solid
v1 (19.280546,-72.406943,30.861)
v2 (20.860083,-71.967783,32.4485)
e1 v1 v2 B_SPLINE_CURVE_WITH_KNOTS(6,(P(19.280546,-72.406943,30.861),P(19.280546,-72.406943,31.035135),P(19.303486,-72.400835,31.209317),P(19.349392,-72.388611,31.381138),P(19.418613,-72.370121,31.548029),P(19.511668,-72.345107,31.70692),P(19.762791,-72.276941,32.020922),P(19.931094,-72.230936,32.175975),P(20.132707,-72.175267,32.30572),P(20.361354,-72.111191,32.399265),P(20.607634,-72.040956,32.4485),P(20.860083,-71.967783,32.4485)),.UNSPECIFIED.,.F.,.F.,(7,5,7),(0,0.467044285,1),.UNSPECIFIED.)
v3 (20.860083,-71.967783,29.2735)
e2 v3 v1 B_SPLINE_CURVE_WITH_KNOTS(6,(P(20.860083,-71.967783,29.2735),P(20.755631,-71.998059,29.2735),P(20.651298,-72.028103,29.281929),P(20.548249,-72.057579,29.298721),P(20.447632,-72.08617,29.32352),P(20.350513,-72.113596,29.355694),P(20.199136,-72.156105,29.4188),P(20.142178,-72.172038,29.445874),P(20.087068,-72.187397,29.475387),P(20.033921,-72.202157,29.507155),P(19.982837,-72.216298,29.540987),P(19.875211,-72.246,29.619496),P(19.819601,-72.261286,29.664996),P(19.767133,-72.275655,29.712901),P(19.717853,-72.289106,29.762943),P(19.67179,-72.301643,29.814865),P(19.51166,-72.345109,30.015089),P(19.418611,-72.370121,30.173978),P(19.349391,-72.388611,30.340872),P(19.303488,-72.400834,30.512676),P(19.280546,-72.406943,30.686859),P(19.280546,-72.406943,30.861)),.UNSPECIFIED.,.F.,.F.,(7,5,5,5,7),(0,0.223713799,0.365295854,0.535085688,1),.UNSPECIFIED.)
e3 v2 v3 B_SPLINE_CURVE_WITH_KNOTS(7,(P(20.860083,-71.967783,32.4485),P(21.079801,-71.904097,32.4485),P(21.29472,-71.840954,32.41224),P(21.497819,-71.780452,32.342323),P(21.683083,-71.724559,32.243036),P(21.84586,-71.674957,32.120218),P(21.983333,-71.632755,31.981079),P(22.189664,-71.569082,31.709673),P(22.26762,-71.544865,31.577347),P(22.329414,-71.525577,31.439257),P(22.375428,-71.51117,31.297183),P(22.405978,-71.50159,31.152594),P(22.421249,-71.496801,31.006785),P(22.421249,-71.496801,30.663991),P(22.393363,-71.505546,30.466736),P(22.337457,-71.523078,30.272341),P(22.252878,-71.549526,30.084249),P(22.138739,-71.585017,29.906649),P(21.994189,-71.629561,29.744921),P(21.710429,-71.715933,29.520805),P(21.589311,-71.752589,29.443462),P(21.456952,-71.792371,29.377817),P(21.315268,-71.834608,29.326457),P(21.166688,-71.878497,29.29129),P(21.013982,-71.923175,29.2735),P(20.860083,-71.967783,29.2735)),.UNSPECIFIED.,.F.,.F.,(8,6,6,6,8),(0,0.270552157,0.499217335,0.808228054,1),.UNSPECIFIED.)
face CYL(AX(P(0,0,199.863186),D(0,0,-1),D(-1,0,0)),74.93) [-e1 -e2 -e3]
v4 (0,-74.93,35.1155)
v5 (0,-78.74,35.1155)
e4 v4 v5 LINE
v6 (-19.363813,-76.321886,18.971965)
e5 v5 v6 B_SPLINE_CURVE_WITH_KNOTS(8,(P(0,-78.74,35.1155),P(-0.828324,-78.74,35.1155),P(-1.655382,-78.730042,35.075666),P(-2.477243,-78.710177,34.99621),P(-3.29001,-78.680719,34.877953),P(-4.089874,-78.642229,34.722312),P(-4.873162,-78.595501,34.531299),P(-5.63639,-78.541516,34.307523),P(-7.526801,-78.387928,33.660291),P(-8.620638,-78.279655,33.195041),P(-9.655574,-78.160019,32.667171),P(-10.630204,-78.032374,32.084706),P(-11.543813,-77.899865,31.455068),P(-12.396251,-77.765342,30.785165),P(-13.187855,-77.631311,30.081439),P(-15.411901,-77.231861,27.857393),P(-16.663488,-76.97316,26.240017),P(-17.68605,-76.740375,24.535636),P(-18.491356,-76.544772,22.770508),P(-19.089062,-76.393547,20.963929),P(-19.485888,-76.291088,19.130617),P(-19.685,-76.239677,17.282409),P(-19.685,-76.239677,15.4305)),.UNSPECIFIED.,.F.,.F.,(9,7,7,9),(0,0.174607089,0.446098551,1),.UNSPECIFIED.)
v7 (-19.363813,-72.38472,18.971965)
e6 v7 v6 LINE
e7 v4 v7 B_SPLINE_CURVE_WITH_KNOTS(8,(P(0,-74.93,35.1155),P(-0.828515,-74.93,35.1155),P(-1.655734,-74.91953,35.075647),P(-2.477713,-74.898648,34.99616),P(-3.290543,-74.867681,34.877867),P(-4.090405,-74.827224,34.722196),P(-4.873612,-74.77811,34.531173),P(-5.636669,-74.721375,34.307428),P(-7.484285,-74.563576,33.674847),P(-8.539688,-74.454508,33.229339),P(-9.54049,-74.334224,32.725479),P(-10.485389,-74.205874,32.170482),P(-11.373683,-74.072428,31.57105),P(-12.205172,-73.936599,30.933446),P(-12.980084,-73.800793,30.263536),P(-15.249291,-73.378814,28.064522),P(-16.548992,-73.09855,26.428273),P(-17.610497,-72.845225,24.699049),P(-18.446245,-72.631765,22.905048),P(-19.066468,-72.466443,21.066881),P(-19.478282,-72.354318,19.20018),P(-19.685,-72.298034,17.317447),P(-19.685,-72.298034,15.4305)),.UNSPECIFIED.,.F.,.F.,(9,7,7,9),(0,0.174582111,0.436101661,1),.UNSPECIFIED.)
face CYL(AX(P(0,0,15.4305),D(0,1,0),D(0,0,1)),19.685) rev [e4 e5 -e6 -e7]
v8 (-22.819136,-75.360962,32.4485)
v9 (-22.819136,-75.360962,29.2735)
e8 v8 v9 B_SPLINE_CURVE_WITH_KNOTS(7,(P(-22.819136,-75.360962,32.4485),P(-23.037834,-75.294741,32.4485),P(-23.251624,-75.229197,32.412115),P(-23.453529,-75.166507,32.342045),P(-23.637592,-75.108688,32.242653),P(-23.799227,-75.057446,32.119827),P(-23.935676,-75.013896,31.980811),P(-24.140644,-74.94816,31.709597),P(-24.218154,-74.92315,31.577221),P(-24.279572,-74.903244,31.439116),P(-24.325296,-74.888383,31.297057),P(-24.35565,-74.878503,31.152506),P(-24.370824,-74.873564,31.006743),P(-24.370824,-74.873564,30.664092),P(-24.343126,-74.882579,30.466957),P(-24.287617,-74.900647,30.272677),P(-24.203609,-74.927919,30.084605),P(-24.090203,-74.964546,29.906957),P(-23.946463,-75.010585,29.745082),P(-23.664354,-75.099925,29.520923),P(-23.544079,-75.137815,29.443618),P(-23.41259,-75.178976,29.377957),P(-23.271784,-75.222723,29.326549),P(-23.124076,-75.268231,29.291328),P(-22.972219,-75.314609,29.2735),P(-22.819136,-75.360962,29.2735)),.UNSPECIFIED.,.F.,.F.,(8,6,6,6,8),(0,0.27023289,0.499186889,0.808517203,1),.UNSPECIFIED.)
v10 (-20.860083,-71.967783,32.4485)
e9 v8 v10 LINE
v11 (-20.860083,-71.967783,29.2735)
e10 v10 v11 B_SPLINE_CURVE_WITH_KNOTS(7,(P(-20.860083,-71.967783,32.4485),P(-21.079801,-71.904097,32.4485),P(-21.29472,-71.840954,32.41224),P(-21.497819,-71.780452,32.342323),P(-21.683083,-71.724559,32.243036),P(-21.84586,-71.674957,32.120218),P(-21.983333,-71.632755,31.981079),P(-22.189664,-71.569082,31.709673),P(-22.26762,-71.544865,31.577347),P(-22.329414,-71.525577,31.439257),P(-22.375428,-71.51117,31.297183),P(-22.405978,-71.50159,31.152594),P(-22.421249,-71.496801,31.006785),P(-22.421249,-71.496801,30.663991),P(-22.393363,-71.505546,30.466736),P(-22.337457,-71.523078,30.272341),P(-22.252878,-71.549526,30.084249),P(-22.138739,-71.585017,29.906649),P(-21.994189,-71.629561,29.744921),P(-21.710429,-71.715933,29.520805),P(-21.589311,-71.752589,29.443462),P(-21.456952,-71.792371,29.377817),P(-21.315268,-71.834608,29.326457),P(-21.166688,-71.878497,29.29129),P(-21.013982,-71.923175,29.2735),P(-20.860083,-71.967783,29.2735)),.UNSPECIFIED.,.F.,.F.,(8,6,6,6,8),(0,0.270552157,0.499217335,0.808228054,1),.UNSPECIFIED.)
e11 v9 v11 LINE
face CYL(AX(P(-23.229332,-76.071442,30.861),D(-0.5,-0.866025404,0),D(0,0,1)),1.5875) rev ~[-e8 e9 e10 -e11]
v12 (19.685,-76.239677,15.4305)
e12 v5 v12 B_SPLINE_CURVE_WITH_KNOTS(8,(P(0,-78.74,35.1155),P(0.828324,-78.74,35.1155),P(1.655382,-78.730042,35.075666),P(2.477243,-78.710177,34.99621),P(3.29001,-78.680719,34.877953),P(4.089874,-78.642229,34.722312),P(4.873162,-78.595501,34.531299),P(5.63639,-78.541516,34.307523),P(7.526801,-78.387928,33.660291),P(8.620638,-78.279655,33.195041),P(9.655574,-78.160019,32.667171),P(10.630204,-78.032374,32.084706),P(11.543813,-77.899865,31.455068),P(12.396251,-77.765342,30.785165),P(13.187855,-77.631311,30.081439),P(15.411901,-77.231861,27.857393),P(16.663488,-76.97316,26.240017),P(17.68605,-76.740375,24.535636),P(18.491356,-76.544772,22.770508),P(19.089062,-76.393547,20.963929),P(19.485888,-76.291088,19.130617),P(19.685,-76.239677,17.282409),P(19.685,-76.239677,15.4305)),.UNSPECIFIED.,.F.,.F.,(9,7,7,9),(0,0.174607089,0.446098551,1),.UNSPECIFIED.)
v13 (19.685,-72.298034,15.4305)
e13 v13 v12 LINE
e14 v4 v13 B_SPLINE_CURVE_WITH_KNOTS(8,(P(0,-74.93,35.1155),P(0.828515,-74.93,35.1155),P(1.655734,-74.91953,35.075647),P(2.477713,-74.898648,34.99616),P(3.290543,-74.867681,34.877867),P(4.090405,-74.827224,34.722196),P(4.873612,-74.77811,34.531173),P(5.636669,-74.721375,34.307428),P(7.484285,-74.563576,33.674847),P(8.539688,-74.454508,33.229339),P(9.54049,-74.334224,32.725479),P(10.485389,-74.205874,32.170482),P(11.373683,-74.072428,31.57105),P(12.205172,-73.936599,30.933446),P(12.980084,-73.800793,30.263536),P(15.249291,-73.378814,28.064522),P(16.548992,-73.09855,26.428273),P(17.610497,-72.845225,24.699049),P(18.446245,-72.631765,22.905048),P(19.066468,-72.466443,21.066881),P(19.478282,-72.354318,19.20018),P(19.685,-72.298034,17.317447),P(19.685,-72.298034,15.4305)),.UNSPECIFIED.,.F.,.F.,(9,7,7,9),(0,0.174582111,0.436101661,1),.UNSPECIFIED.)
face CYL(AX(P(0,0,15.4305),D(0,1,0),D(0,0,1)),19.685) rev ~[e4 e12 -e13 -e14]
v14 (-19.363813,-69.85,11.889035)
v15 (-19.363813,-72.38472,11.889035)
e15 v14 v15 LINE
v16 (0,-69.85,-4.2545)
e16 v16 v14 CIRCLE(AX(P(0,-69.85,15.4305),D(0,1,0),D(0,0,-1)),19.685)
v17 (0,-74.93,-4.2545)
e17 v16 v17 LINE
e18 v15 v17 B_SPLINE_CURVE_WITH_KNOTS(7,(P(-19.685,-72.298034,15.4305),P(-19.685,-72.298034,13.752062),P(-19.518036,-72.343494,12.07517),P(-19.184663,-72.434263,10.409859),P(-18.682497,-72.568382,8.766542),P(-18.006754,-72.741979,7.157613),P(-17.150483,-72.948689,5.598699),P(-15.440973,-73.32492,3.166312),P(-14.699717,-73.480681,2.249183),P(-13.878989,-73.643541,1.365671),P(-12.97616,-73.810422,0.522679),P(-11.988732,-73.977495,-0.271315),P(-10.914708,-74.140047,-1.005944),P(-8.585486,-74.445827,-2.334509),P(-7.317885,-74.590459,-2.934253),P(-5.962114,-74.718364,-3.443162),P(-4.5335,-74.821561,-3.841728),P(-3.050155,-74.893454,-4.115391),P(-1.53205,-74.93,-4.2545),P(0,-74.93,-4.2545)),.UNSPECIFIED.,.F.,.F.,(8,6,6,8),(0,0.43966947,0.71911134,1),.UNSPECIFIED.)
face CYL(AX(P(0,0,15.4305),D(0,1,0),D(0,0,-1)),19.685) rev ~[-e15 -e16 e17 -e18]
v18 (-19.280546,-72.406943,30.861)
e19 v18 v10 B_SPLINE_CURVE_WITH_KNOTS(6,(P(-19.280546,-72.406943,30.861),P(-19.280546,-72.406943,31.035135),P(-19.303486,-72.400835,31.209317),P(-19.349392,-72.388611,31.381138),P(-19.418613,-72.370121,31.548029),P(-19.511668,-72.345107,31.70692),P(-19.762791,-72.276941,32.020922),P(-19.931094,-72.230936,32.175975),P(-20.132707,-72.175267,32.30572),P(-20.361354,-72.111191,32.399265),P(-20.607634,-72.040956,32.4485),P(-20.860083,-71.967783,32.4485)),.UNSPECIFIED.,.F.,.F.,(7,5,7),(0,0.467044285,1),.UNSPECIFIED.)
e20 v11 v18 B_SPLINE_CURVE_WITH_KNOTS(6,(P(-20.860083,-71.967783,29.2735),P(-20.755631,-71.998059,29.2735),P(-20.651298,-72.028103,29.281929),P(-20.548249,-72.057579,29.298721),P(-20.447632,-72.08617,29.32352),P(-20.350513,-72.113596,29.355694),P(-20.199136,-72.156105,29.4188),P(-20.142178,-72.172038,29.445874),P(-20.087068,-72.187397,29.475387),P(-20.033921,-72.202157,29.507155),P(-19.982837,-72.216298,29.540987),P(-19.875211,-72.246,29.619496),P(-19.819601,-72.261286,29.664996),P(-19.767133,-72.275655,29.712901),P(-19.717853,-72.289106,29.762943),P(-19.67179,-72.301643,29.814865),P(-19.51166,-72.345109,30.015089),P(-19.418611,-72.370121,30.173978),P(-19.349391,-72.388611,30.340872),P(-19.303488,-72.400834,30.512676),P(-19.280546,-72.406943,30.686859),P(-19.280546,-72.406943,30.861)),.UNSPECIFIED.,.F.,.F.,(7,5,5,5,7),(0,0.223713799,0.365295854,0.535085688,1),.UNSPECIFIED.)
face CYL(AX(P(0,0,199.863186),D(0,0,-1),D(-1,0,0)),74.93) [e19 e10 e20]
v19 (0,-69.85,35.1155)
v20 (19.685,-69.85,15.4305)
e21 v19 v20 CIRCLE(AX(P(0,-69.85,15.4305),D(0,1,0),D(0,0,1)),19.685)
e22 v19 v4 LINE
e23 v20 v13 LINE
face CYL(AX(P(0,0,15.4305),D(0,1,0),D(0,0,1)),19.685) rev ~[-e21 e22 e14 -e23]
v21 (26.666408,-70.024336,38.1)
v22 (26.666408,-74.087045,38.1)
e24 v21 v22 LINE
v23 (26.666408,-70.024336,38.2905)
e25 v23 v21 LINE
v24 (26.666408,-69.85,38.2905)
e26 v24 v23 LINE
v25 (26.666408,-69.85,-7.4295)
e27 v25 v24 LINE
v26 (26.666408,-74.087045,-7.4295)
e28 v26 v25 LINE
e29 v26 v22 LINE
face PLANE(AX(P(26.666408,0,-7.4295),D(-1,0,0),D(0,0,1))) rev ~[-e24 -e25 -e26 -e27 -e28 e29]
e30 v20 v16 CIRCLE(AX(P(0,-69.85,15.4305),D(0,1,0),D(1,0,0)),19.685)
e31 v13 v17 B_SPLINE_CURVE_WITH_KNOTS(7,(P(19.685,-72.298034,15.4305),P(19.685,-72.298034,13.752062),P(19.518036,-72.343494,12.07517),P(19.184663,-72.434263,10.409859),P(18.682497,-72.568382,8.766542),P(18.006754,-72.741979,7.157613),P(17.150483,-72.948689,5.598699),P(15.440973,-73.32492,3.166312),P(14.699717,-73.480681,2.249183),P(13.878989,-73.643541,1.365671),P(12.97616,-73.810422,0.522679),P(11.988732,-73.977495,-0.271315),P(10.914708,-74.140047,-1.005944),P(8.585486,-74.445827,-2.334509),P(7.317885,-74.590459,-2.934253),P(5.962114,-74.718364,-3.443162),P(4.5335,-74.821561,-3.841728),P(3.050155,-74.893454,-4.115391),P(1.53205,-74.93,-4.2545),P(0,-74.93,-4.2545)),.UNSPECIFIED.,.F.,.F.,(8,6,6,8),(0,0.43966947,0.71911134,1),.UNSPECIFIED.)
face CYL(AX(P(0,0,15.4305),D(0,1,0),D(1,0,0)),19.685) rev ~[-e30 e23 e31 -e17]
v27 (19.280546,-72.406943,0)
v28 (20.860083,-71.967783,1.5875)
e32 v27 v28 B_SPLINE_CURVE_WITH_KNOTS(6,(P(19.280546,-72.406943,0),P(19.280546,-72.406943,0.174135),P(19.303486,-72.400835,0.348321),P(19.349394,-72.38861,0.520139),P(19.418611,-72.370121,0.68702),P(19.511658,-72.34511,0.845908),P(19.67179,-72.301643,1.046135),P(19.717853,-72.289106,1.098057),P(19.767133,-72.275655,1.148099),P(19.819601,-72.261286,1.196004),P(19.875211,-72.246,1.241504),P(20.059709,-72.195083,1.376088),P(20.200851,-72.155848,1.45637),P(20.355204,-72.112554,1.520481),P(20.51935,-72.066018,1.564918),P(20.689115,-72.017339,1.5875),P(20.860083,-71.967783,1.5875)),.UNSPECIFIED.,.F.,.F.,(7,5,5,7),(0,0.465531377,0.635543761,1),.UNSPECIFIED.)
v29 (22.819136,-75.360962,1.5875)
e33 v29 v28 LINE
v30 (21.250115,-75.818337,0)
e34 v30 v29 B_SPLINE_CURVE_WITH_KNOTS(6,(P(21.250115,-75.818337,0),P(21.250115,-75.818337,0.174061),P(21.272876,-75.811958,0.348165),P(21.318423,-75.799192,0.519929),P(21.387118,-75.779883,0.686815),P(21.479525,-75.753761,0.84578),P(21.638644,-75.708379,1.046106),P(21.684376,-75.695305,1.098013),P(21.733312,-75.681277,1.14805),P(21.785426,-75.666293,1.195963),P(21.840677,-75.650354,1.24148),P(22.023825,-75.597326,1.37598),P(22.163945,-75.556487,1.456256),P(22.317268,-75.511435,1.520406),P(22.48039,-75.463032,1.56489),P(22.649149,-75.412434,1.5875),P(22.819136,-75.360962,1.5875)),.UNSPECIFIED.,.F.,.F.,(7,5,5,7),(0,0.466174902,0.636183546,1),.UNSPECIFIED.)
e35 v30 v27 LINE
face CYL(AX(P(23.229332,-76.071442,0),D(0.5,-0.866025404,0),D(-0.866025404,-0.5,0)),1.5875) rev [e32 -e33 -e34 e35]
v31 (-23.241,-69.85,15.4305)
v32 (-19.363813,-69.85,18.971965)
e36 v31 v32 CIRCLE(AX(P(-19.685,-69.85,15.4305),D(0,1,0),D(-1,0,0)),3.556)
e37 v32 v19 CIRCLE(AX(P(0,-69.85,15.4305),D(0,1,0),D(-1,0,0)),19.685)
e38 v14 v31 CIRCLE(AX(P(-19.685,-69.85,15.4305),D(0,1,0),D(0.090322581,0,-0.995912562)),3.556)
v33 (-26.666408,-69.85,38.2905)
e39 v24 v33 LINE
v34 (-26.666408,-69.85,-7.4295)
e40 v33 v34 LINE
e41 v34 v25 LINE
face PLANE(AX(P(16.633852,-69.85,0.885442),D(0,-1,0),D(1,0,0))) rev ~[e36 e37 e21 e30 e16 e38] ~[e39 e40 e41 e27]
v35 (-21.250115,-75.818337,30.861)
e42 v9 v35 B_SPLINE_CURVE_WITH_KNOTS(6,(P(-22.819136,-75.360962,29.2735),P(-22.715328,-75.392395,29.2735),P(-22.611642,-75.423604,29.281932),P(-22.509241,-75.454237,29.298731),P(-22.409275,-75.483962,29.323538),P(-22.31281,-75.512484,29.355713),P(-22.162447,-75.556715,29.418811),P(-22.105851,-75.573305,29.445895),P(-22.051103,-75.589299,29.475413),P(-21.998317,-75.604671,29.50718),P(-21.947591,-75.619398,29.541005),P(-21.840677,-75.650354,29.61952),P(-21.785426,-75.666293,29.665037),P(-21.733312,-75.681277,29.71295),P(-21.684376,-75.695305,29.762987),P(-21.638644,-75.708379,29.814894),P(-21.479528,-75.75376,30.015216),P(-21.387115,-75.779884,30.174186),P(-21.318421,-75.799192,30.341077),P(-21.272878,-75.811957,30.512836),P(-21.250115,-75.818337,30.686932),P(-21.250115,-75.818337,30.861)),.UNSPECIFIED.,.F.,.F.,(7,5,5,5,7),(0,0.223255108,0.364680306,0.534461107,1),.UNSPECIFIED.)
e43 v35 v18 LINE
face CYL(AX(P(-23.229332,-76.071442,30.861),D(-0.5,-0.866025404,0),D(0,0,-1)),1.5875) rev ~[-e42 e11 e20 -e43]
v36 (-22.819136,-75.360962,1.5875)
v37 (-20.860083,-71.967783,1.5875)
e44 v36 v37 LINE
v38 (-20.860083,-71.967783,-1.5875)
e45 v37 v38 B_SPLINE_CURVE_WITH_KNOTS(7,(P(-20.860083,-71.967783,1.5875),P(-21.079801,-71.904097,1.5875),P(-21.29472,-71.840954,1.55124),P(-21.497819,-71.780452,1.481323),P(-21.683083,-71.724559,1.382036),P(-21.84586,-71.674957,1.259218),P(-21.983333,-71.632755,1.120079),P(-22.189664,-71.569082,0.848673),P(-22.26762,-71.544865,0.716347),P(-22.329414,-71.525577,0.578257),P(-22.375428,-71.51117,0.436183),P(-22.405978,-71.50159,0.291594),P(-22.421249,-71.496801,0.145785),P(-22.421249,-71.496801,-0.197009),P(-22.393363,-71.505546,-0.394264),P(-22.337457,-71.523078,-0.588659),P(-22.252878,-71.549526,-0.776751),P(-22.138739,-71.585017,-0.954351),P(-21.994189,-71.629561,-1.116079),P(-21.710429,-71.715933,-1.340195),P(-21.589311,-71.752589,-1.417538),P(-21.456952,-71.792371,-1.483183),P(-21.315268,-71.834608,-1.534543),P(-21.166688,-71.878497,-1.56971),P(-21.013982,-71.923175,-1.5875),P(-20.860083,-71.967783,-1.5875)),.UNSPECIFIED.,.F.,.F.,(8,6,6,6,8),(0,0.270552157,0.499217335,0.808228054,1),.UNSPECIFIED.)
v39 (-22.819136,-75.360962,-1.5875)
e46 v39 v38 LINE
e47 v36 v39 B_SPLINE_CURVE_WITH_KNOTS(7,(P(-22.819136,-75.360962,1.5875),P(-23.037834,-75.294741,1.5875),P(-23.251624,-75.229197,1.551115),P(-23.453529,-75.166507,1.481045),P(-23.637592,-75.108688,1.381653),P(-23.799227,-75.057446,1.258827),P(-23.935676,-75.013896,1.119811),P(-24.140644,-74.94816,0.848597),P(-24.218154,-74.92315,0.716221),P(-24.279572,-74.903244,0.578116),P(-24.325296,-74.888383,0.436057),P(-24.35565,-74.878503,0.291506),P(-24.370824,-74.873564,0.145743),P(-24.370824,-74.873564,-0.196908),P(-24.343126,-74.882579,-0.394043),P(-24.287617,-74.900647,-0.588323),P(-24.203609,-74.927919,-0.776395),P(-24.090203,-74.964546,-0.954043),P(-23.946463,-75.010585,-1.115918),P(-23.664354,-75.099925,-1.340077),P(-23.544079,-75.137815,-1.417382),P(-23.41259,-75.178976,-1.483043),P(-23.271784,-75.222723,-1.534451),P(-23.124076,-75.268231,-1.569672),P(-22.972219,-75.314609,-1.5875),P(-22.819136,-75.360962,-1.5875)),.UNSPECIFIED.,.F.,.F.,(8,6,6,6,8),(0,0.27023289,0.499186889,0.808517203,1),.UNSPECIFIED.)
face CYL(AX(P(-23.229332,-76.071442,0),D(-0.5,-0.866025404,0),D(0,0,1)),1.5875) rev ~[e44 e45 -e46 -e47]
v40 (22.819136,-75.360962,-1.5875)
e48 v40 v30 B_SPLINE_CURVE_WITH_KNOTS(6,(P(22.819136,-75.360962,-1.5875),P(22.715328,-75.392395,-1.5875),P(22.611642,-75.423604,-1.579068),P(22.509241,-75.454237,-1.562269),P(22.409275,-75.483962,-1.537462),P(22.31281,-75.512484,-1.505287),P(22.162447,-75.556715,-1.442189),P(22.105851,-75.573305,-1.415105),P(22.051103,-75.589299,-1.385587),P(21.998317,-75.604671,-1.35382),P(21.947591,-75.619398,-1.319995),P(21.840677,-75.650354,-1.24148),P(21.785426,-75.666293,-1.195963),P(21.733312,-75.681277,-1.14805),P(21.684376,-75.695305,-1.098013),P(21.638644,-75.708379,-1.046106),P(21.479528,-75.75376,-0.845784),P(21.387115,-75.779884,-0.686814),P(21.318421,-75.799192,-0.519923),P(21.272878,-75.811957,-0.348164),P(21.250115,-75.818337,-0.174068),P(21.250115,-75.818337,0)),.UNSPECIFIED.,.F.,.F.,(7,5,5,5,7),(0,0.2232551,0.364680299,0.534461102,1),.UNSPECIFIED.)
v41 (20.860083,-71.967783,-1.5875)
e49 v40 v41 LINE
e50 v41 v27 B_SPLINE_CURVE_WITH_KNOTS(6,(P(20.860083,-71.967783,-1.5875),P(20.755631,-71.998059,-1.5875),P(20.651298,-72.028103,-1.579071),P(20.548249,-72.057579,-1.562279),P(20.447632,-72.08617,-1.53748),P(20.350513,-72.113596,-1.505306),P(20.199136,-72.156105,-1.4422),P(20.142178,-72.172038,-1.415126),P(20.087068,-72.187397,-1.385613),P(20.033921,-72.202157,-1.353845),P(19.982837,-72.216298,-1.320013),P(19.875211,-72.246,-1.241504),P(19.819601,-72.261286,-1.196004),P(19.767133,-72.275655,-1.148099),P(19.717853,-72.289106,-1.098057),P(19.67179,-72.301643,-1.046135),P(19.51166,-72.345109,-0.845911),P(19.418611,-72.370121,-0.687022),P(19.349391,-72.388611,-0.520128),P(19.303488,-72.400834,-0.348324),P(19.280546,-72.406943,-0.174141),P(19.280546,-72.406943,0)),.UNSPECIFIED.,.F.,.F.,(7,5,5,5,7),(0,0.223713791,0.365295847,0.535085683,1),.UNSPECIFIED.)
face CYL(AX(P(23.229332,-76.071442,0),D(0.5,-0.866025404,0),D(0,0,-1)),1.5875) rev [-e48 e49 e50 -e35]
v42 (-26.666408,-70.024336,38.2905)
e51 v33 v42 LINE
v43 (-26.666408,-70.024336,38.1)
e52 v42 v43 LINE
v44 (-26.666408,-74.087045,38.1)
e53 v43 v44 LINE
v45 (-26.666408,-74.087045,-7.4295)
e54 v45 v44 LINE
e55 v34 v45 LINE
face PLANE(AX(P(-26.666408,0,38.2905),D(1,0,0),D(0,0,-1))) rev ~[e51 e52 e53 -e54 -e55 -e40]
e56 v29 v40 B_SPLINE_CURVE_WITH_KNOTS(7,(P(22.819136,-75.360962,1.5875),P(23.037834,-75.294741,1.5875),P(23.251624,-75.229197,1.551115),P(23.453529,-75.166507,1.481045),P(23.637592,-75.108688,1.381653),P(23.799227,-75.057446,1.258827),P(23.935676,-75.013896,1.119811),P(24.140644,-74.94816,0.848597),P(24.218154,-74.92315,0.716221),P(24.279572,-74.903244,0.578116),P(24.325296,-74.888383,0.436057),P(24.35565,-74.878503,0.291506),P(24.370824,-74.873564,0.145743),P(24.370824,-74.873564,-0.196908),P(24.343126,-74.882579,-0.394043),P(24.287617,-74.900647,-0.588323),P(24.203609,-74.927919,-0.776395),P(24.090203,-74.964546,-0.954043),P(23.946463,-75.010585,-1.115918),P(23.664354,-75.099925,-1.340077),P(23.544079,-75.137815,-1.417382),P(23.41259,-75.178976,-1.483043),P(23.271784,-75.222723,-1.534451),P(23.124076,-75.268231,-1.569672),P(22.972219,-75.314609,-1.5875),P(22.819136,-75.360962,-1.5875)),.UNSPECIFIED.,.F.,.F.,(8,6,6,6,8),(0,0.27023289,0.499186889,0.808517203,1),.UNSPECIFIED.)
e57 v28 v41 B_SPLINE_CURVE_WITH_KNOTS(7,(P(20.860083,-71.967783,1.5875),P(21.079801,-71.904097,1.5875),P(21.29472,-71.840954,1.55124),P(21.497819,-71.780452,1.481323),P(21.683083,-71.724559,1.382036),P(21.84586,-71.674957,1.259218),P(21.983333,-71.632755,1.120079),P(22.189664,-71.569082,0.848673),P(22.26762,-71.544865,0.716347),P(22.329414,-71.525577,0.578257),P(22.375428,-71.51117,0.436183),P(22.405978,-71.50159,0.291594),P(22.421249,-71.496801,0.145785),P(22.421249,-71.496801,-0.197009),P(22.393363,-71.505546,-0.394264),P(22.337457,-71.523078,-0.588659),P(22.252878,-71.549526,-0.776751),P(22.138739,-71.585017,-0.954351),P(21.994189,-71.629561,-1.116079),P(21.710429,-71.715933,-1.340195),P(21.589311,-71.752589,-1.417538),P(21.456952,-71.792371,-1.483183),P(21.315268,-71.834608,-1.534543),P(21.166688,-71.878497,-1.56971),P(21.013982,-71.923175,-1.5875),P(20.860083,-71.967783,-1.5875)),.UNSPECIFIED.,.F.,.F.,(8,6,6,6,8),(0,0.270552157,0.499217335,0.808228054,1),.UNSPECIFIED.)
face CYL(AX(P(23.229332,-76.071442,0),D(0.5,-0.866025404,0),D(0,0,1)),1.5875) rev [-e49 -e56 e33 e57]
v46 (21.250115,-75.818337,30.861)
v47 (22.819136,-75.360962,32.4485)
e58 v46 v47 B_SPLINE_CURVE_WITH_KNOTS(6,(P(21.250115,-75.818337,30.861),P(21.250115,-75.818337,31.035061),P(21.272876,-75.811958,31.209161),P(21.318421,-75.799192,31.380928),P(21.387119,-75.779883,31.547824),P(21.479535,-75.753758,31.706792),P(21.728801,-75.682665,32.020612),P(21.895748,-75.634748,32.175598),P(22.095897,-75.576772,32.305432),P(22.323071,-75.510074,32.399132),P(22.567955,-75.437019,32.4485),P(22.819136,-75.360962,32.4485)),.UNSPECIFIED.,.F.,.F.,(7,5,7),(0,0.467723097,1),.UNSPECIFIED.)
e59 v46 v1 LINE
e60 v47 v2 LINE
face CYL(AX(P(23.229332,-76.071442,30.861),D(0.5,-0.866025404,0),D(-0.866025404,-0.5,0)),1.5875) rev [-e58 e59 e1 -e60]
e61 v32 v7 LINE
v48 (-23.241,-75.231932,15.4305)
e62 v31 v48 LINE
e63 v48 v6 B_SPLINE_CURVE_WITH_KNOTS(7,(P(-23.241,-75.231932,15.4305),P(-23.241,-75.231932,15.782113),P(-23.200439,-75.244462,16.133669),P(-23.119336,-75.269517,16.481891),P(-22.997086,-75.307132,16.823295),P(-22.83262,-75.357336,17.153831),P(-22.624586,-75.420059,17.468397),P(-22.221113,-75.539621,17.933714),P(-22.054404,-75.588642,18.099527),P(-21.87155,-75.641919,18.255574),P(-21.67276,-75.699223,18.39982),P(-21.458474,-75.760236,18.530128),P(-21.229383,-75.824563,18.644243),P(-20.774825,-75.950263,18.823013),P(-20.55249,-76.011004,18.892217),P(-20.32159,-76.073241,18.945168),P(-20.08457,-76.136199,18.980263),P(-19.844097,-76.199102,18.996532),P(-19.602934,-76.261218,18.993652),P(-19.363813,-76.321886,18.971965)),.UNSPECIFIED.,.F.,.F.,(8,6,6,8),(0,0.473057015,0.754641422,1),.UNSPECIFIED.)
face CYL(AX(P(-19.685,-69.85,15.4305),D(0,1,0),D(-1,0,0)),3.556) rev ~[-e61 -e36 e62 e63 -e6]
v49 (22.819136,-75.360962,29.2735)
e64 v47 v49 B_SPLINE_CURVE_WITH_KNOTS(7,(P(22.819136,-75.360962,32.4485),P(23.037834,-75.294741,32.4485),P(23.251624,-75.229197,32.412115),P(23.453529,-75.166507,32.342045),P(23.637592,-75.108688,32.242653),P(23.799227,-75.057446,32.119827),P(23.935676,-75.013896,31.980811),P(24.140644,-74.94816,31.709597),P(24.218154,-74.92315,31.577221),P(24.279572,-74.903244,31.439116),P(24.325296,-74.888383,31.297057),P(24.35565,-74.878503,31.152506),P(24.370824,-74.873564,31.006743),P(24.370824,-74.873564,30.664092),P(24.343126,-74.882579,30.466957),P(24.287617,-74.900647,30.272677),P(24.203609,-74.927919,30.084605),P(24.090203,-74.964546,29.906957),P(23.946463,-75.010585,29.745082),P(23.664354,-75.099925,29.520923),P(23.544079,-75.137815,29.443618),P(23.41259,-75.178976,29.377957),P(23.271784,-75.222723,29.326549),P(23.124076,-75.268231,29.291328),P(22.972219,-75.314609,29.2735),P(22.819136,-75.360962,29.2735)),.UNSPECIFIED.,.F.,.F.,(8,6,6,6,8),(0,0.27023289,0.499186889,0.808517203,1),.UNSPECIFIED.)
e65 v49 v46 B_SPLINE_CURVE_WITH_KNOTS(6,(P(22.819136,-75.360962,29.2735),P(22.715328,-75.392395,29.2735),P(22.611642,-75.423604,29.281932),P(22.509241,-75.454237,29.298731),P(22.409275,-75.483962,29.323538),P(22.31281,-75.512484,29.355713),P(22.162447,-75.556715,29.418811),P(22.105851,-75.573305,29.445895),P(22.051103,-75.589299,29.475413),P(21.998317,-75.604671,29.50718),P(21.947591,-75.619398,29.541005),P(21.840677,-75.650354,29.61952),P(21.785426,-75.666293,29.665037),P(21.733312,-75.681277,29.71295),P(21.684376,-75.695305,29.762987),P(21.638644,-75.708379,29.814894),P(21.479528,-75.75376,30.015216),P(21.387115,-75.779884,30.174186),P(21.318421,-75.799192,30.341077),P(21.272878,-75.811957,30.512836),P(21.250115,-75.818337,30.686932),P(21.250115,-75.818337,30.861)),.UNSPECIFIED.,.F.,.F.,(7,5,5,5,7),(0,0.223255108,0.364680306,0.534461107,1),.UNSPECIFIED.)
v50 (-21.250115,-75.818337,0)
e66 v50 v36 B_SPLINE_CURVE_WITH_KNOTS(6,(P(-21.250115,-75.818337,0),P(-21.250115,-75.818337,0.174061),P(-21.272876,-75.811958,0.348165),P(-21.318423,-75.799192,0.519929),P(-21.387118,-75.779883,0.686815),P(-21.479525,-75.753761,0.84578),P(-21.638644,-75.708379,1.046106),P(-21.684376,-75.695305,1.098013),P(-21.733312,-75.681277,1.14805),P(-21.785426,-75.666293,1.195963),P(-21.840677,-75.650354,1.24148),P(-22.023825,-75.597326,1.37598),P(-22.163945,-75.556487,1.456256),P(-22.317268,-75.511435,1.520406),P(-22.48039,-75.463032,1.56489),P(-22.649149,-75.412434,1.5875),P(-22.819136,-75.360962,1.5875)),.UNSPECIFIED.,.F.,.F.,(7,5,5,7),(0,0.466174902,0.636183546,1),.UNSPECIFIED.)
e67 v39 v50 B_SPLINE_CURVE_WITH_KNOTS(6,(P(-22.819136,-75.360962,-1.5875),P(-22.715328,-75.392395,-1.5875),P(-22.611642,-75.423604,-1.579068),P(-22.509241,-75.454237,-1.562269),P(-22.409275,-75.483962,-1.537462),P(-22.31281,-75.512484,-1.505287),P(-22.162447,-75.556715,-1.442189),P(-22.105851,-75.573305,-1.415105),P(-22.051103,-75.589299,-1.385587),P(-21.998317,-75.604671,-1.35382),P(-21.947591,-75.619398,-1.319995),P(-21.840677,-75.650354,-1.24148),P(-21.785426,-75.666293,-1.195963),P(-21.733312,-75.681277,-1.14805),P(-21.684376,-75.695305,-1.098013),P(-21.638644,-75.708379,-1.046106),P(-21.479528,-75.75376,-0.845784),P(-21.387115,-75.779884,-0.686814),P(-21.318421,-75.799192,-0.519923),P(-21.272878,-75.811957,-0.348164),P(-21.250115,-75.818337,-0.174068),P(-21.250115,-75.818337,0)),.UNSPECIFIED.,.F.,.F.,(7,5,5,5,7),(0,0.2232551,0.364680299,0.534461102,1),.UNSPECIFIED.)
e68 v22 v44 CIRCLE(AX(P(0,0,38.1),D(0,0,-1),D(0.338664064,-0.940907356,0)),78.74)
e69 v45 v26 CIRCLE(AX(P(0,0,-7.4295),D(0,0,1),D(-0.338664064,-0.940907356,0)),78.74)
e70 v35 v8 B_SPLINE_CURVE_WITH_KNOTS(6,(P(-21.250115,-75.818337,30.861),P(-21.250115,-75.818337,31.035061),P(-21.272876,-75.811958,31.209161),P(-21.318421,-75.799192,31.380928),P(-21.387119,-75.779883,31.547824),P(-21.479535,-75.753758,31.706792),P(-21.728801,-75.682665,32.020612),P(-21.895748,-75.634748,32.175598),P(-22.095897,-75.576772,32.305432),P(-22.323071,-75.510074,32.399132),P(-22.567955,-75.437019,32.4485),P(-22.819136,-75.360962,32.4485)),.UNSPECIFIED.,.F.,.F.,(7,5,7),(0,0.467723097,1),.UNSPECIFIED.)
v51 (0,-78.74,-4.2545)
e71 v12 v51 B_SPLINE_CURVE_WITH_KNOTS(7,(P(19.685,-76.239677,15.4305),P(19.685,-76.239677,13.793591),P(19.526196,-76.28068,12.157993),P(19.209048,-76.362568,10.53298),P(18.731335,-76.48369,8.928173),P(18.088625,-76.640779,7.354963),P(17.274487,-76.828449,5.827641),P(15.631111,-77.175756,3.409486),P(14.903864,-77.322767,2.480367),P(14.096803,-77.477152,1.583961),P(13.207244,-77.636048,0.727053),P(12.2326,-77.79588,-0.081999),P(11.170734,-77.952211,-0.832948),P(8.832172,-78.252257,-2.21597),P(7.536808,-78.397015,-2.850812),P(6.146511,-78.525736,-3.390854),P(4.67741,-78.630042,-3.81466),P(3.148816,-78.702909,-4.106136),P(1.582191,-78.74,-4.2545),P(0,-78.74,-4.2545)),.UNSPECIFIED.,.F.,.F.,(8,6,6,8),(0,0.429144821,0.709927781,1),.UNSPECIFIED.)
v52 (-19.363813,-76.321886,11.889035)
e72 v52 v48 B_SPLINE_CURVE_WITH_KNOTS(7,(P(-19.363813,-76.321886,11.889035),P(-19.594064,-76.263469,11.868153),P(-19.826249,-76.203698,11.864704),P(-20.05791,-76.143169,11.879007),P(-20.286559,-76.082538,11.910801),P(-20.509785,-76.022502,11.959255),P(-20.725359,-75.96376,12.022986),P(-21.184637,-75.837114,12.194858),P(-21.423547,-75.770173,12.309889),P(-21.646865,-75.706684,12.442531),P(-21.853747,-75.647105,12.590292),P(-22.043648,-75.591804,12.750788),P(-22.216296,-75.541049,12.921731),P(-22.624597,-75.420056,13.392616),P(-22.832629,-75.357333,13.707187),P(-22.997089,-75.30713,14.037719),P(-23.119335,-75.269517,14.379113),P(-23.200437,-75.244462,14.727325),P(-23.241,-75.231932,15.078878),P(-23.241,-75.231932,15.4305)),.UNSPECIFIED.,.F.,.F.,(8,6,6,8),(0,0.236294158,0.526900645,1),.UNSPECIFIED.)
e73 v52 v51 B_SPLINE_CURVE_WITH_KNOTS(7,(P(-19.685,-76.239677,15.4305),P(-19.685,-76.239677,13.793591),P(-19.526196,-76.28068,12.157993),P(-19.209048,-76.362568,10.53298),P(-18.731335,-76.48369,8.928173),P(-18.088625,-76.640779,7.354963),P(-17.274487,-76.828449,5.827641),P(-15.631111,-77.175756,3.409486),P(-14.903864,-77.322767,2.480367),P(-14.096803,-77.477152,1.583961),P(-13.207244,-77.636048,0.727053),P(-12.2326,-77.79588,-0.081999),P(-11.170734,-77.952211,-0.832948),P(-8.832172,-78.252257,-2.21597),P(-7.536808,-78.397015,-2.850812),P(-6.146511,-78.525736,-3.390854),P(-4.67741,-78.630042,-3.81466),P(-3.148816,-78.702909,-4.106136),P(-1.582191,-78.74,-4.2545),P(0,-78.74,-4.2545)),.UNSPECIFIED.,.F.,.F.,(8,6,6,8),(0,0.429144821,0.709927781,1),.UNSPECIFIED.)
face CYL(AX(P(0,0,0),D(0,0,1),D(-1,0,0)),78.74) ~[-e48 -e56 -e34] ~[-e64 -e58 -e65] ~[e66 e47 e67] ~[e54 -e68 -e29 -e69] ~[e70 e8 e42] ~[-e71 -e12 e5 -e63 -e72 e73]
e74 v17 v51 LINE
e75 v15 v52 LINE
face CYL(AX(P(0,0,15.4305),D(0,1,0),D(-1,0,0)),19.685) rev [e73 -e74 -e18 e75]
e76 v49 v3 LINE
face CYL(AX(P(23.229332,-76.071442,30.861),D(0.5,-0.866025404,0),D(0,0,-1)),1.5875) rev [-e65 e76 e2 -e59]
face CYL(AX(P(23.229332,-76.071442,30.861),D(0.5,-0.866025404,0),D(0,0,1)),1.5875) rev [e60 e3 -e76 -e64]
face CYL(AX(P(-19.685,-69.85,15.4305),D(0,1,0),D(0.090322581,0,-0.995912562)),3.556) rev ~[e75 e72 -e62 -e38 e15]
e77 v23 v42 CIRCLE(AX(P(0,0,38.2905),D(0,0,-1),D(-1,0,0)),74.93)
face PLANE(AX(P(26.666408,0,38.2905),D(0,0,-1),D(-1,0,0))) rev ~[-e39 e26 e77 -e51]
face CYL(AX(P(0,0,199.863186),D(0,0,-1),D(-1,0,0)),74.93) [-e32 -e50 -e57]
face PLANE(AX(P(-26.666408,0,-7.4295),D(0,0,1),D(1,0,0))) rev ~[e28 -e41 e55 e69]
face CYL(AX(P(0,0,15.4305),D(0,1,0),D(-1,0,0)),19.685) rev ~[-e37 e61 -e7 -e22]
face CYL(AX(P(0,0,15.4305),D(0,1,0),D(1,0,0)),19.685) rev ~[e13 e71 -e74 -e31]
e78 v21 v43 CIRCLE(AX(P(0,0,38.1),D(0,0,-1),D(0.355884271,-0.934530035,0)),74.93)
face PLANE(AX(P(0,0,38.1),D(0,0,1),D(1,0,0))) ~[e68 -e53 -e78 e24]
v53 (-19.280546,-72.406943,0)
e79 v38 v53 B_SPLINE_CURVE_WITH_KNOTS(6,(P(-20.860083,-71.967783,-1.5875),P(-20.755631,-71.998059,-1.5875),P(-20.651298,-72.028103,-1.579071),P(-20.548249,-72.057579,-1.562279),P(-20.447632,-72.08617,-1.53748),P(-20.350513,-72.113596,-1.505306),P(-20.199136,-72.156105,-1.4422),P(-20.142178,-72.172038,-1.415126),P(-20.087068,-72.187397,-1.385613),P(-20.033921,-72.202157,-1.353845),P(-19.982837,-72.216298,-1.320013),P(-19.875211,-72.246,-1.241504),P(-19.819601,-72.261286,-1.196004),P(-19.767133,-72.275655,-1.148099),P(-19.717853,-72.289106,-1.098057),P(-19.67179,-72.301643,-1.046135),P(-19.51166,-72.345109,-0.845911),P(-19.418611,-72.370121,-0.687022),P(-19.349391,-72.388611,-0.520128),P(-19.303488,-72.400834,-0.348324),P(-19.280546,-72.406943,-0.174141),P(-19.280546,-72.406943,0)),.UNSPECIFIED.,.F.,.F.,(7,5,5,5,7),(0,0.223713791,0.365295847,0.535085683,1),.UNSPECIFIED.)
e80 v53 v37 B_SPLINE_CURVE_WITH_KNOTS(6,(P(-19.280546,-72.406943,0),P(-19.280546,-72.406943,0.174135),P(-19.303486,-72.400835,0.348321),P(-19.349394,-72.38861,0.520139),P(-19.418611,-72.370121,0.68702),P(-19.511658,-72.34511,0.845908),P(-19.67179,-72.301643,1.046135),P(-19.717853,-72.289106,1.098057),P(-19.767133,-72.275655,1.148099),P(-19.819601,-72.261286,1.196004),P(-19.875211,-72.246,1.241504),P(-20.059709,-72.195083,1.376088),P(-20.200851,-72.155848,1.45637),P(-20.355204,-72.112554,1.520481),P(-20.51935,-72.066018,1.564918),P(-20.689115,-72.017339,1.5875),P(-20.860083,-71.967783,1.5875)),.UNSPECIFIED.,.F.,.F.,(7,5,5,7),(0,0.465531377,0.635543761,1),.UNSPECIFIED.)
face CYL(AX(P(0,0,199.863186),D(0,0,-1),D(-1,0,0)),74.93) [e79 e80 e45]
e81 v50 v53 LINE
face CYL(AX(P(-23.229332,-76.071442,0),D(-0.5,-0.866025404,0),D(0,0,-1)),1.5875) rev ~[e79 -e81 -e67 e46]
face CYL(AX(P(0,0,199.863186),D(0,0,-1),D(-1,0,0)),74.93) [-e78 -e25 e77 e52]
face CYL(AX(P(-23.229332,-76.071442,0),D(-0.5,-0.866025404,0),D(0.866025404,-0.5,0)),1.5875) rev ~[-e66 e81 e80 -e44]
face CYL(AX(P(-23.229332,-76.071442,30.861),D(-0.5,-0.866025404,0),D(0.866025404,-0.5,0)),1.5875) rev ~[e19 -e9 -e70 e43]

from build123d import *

# Parameters (mm, degrees)
F0_R           = 78.74
F0_R_2         = 74.93
F1_DEPTH       = 38.1
F2_R           = 1.5875
F3_DEPTH       = 177.8
F7_DEPTH       = 25.4
F8_W           = 170.1503526419
F8_H           = 177.0643368363
F9_DEPTH       = 76.2
F12_END_RADIUS = 74.93
F12_REACH      = 113.8647376176
F13_DEPTH      = 69.85
F15_DEPTH      = 8.8910001


with BuildPart() as f1:
    # F0 (on Top) → F1 (new body, symmetric)
    with BuildSketch(Plane.XY):
        Circle(F0_R)
        Circle(F0_R_2, mode=Mode.SUBTRACT)
    extrude(amount=F1_DEPTH, both=True)

    # F2 (on Front) → F3 (intersect)
    with BuildSketch(Plane.XZ):
        with BuildLine():
            ThreePointArc((-19.685, 15.4305), (-13.9193969877, 29.3498969877), (0, 35.1155))
            Line((0, 35.1155), (0, 38.2905))
            Line((0, 38.2905), (-26.6664084047, 38.2905))
            Line((-26.6664084047, 38.2905), (-26.6664084047, 15.4305))
            Line((-26.6664084047, 15.4305), (-19.685, 15.4305))
        make_face()
        with Locations((-23.8125, 30.861)):
            Circle(F2_R, mode=Mode.SUBTRACT)
        with BuildLine():
            Line((0, -7.4295), (0, -4.2545))
            ThreePointArc((0, -4.2545), (-13.9193969877, 1.5111030123), (-19.685, 15.4305))
            Line((-19.685, 15.4305), (-26.6664084047, 15.4305))
            Line((-26.6664084047, 15.4305), (-26.6664084047, -7.4295))
            Line((-26.6664084047, -7.4295), (0, -7.4295))
        make_face()
        with Locations((-23.8125, 0)):
            Circle(F2_R, mode=Mode.SUBTRACT)
        with BuildLine():
            Line((26.6664084047, 15.4305), (19.685, 15.4305))
            ThreePointArc((19.685, 15.4305), (13.9193969877, 1.5111030123), (0, -4.2545))
            Line((0, -4.2545), (0, -7.4295))
            Line((0, -7.4295), (26.6664084047, -7.4295))
            Line((26.6664084047, -7.4295), (26.6664084047, 15.4305))
        make_face()
        with Locations((23.8125, 0)):
            Circle(F2_R, mode=Mode.SUBTRACT)
        with BuildLine():
            ThreePointArc((0, 35.1155), (13.9193969877, 29.3498969877), (19.685, 15.4305))
            Line((19.685, 15.4305), (26.6664084047, 15.4305))
            Line((26.6664084047, 15.4305), (26.6664084047, 38.2905))
            Line((26.6664084047, 38.2905), (0, 38.2905))
            Line((0, 38.2905), (0, 35.1155))
        make_face()
        with Locations((23.8125, 30.861)):
            Circle(F2_R, mode=Mode.SUBTRACT)
        with Locations((-23.8125, 30.861)):
            Circle(F2_R)
        with Locations((23.8125, 30.861)):
            Circle(F2_R)
        with Locations((-23.8125, 0)):
            Circle(F2_R)
        with Locations((23.8125, 0)):
            Circle(F2_R)
    extrude(amount=F3_DEPTH, mode=Mode.INTERSECT)

    # F6 (on face) → F7 (cut)
    with BuildSketch(Plane(origin=(38.7472337077, -67.1121774345, 0), x_dir=(-0.8660254038, -0.5, 0), z_dir=(-0.5, 0.8660254038, 0))):
        with BuildLine():
            ThreePointArc((19.5060294768, 0), (19.041061492, 1.1225320151), (17.9185294768, 1.5875))
            Line((17.9185294768, 1.5875), (17.9185294768, -1.5875))
            ThreePointArc((17.9185294768, -1.5875), (19.041061492, -1.1225320151), (19.5060294768, 0))
        make_face()
        with BuildLine():
            Line((17.9185294768, -1.5875), (17.9185294768, 1.5875))
            ThreePointArc((17.9185294768, 1.5875), (16.3310294768, 0), (17.9185294768, -1.5875))
        make_face()
        with BuildLine():
            ThreePointArc((19.5060294768, 30.861), (19.041061492, 31.9835320151), (17.9185294768, 32.4485))
            Line((17.9185294768, 32.4485), (17.9185294768, 29.2735))
            ThreePointArc((17.9185294768, 29.2735), (19.041061492, 29.7384679849), (19.5060294768, 30.861))
        make_face()
        with BuildLine():
            Line((17.9185294768, 29.2735), (17.9185294768, 32.4485))
            ThreePointArc((17.9185294768, 32.4485), (16.3310294768, 30.861), (17.9185294768, 29.2735))
        make_face()
    extrude(amount=F7_DEPTH, mode=Mode.SUBTRACT)

    # F8 (on Right) → F9 (cut)
    with BuildSketch(Plane.YZ):
        with Locations((-62.6385295764, 18.013317138)):
            Rectangle(F8_W, F8_H)
    extrude(amount=-F9_DEPTH, mode=Mode.SUBTRACT)

    # F10: F1 across plane


with BuildPart() as f1_1:
    add(f1.part)
    add(f1.part.mirror(Plane.YZ))

    f12_end = (Plane(origin=(0, 0, 15.33525), x_dir=(-1, 0, 0), z_dir=(0, 0, -1)) * Cylinder(F12_END_RADIUS, 369.0558714917, mode=Mode.PRIVATE)).faces().sort_by_distance((0, -74.93, -6.7265497667))[0]
    # F2 (on Front) → F12 (join, up to the whole of a round face its end follows)
    with BuildSketch(Plane.XZ):
        with BuildLine():
            ThreePointArc((0, 35.1155), (13.9193969877, 29.3498969877), (19.685, 15.4305))
            Line((19.685, 15.4305), (26.6664084047, 15.4305))
            Line((26.6664084047, 15.4305), (26.6664084047, 38.2905))
            Line((26.6664084047, 38.2905), (0, 38.2905))
            Line((0, 38.2905), (0, 35.1155))
        make_face()
        with Locations((23.8125, 30.861)):
            Circle(F2_R, mode=Mode.SUBTRACT)
        with BuildLine():
            ThreePointArc((-19.685, 15.4305), (-13.9193969877, 29.3498969877), (0, 35.1155))
            Line((0, 35.1155), (0, 38.2905))
            Line((0, 38.2905), (-26.6664084047, 38.2905))
            Line((-26.6664084047, 38.2905), (-26.6664084047, 15.4305))
            Line((-26.6664084047, 15.4305), (-19.685, 15.4305))
        make_face()
        with Locations((-23.8125, 30.861)):
            Circle(F2_R, mode=Mode.SUBTRACT)
        with BuildLine():
            Line((0, -7.4295), (0, -4.2545))
            ThreePointArc((0, -4.2545), (-13.9193969877, 1.5111030123), (-19.685, 15.4305))
            Line((-19.685, 15.4305), (-26.6664084047, 15.4305))
            Line((-26.6664084047, 15.4305), (-26.6664084047, -7.4295))
            Line((-26.6664084047, -7.4295), (0, -7.4295))
        make_face()
        with Locations((-23.8125, 0)):
            Circle(F2_R, mode=Mode.SUBTRACT)
        with BuildLine():
            Line((26.6664084047, 15.4305), (19.685, 15.4305))
            ThreePointArc((19.685, 15.4305), (13.9193969877, 1.5111030123), (0, -4.2545))
            Line((0, -4.2545), (0, -7.4295))
            Line((0, -7.4295), (26.6664084047, -7.4295))
            Line((26.6664084047, -7.4295), (26.6664084047, 15.4305))
        make_face()
        with Locations((23.8125, 0)):
            Circle(F2_R, mode=Mode.SUBTRACT)
        with Locations((-23.8125, 0)):
            Circle(F2_R)
        with Locations((-23.8125, 30.861)):
            Circle(F2_R)
        with Locations((23.8125, 30.861)):
            Circle(F2_R)
        with Locations((23.8125, 0)):
            Circle(F2_R)
    f12_long = extrude(amount=F12_REACH, mode=Mode.PRIVATE)
    add(split(f12_long, bisect_by=f12_end, keep=Keep.BOTTOM, mode=Mode.PRIVATE))

    # F2 (on Front) → F13 (cut)
    with BuildSketch(Plane.XZ):
        with BuildLine():
            Line((26.6664084047, 15.4305), (19.685, 15.4305))
            ThreePointArc((19.685, 15.4305), (13.9193969877, 1.5111030123), (0, -4.2545))
            Line((0, -4.2545), (0, -7.4295))
            Line((0, -7.4295), (26.6664084047, -7.4295))
            Line((26.6664084047, -7.4295), (26.6664084047, 15.4305))
        make_face()
        with Locations((23.8125, 0)):
            Circle(F2_R, mode=Mode.SUBTRACT)
        with BuildLine():
            ThreePointArc((-19.685, 15.4305), (-13.9193969877, 29.3498969877), (0, 35.1155))
            Line((0, 35.1155), (0, 38.2905))
            Line((0, 38.2905), (-26.6664084047, 38.2905))
            Line((-26.6664084047, 38.2905), (-26.6664084047, 15.4305))
            Line((-26.6664084047, 15.4305), (-19.685, 15.4305))
        make_face()
        with Locations((-23.8125, 30.861)):
            Circle(F2_R, mode=Mode.SUBTRACT)
        with BuildLine():
            Line((0, -7.4295), (0, -4.2545))
            ThreePointArc((0, -4.2545), (-13.9193969877, 1.5111030123), (-19.685, 15.4305))
            Line((-19.685, 15.4305), (-26.6664084047, 15.4305))
            Line((-26.6664084047, 15.4305), (-26.6664084047, -7.4295))
            Line((-26.6664084047, -7.4295), (0, -7.4295))
        make_face()
        with Locations((-23.8125, 0)):
            Circle(F2_R, mode=Mode.SUBTRACT)
        with BuildLine():
            ThreePointArc((0, 35.1155), (13.9193969877, 29.3498969877), (19.685, 15.4305))
            Line((19.685, 15.4305), (26.6664084047, 15.4305))
            Line((26.6664084047, 15.4305), (26.6664084047, 38.2905))
            Line((26.6664084047, 38.2905), (0, 38.2905))
            Line((0, 38.2905), (0, 35.1155))
        make_face()
        with Locations((23.8125, 30.861)):
            Circle(F2_R, mode=Mode.SUBTRACT)
        with Locations((-23.8125, 0)):
            Circle(F2_R)
        with Locations((23.8125, 0)):
            Circle(F2_R)
        with Locations((23.8125, 30.861)):
            Circle(F2_R)
        with Locations((-23.8125, 30.861)):
            Circle(F2_R)
    extrude(amount=F13_DEPTH, mode=Mode.SUBTRACT)

    # F14 (on face) → F15 (cut, through all)
    with BuildSketch(Plane(origin=(0, -69.85, 0), x_dir=(-1, 0, 0), z_dir=(0, 1, 0))):
        with BuildLine():
            ThreePointArc((19.3638129032, 18.971965071), (19.6045387857, 17.2085), (19.685, 15.4305))
            ThreePointArc((19.685, 15.4305), (19.6045387857, 13.6525), (19.3638129032, 11.889034929))
            ThreePointArc((19.3638129032, 11.889034929), (22.0832279587, 12.8049260326), (23.241, 15.4305))
            ThreePointArc((23.241, 15.4305), (22.0832279587, 18.0560739674), (19.3638129032, 18.971965071))
        make_face()
        with BuildLine():
            ThreePointArc((19.3638129032, 11.889034929), (19.6045387857, 13.6525), (19.685, 15.4305))
            Line((19.685, 15.4305), (16.129, 15.4305))
            ThreePointArc((16.129, 15.4305), (17.0594260326, 13.0322720413), (19.3638129032, 11.889034929))
        make_face()
    extrude(amount=-F15_DEPTH, mode=Mode.SUBTRACT)


solid = f1_1.part
